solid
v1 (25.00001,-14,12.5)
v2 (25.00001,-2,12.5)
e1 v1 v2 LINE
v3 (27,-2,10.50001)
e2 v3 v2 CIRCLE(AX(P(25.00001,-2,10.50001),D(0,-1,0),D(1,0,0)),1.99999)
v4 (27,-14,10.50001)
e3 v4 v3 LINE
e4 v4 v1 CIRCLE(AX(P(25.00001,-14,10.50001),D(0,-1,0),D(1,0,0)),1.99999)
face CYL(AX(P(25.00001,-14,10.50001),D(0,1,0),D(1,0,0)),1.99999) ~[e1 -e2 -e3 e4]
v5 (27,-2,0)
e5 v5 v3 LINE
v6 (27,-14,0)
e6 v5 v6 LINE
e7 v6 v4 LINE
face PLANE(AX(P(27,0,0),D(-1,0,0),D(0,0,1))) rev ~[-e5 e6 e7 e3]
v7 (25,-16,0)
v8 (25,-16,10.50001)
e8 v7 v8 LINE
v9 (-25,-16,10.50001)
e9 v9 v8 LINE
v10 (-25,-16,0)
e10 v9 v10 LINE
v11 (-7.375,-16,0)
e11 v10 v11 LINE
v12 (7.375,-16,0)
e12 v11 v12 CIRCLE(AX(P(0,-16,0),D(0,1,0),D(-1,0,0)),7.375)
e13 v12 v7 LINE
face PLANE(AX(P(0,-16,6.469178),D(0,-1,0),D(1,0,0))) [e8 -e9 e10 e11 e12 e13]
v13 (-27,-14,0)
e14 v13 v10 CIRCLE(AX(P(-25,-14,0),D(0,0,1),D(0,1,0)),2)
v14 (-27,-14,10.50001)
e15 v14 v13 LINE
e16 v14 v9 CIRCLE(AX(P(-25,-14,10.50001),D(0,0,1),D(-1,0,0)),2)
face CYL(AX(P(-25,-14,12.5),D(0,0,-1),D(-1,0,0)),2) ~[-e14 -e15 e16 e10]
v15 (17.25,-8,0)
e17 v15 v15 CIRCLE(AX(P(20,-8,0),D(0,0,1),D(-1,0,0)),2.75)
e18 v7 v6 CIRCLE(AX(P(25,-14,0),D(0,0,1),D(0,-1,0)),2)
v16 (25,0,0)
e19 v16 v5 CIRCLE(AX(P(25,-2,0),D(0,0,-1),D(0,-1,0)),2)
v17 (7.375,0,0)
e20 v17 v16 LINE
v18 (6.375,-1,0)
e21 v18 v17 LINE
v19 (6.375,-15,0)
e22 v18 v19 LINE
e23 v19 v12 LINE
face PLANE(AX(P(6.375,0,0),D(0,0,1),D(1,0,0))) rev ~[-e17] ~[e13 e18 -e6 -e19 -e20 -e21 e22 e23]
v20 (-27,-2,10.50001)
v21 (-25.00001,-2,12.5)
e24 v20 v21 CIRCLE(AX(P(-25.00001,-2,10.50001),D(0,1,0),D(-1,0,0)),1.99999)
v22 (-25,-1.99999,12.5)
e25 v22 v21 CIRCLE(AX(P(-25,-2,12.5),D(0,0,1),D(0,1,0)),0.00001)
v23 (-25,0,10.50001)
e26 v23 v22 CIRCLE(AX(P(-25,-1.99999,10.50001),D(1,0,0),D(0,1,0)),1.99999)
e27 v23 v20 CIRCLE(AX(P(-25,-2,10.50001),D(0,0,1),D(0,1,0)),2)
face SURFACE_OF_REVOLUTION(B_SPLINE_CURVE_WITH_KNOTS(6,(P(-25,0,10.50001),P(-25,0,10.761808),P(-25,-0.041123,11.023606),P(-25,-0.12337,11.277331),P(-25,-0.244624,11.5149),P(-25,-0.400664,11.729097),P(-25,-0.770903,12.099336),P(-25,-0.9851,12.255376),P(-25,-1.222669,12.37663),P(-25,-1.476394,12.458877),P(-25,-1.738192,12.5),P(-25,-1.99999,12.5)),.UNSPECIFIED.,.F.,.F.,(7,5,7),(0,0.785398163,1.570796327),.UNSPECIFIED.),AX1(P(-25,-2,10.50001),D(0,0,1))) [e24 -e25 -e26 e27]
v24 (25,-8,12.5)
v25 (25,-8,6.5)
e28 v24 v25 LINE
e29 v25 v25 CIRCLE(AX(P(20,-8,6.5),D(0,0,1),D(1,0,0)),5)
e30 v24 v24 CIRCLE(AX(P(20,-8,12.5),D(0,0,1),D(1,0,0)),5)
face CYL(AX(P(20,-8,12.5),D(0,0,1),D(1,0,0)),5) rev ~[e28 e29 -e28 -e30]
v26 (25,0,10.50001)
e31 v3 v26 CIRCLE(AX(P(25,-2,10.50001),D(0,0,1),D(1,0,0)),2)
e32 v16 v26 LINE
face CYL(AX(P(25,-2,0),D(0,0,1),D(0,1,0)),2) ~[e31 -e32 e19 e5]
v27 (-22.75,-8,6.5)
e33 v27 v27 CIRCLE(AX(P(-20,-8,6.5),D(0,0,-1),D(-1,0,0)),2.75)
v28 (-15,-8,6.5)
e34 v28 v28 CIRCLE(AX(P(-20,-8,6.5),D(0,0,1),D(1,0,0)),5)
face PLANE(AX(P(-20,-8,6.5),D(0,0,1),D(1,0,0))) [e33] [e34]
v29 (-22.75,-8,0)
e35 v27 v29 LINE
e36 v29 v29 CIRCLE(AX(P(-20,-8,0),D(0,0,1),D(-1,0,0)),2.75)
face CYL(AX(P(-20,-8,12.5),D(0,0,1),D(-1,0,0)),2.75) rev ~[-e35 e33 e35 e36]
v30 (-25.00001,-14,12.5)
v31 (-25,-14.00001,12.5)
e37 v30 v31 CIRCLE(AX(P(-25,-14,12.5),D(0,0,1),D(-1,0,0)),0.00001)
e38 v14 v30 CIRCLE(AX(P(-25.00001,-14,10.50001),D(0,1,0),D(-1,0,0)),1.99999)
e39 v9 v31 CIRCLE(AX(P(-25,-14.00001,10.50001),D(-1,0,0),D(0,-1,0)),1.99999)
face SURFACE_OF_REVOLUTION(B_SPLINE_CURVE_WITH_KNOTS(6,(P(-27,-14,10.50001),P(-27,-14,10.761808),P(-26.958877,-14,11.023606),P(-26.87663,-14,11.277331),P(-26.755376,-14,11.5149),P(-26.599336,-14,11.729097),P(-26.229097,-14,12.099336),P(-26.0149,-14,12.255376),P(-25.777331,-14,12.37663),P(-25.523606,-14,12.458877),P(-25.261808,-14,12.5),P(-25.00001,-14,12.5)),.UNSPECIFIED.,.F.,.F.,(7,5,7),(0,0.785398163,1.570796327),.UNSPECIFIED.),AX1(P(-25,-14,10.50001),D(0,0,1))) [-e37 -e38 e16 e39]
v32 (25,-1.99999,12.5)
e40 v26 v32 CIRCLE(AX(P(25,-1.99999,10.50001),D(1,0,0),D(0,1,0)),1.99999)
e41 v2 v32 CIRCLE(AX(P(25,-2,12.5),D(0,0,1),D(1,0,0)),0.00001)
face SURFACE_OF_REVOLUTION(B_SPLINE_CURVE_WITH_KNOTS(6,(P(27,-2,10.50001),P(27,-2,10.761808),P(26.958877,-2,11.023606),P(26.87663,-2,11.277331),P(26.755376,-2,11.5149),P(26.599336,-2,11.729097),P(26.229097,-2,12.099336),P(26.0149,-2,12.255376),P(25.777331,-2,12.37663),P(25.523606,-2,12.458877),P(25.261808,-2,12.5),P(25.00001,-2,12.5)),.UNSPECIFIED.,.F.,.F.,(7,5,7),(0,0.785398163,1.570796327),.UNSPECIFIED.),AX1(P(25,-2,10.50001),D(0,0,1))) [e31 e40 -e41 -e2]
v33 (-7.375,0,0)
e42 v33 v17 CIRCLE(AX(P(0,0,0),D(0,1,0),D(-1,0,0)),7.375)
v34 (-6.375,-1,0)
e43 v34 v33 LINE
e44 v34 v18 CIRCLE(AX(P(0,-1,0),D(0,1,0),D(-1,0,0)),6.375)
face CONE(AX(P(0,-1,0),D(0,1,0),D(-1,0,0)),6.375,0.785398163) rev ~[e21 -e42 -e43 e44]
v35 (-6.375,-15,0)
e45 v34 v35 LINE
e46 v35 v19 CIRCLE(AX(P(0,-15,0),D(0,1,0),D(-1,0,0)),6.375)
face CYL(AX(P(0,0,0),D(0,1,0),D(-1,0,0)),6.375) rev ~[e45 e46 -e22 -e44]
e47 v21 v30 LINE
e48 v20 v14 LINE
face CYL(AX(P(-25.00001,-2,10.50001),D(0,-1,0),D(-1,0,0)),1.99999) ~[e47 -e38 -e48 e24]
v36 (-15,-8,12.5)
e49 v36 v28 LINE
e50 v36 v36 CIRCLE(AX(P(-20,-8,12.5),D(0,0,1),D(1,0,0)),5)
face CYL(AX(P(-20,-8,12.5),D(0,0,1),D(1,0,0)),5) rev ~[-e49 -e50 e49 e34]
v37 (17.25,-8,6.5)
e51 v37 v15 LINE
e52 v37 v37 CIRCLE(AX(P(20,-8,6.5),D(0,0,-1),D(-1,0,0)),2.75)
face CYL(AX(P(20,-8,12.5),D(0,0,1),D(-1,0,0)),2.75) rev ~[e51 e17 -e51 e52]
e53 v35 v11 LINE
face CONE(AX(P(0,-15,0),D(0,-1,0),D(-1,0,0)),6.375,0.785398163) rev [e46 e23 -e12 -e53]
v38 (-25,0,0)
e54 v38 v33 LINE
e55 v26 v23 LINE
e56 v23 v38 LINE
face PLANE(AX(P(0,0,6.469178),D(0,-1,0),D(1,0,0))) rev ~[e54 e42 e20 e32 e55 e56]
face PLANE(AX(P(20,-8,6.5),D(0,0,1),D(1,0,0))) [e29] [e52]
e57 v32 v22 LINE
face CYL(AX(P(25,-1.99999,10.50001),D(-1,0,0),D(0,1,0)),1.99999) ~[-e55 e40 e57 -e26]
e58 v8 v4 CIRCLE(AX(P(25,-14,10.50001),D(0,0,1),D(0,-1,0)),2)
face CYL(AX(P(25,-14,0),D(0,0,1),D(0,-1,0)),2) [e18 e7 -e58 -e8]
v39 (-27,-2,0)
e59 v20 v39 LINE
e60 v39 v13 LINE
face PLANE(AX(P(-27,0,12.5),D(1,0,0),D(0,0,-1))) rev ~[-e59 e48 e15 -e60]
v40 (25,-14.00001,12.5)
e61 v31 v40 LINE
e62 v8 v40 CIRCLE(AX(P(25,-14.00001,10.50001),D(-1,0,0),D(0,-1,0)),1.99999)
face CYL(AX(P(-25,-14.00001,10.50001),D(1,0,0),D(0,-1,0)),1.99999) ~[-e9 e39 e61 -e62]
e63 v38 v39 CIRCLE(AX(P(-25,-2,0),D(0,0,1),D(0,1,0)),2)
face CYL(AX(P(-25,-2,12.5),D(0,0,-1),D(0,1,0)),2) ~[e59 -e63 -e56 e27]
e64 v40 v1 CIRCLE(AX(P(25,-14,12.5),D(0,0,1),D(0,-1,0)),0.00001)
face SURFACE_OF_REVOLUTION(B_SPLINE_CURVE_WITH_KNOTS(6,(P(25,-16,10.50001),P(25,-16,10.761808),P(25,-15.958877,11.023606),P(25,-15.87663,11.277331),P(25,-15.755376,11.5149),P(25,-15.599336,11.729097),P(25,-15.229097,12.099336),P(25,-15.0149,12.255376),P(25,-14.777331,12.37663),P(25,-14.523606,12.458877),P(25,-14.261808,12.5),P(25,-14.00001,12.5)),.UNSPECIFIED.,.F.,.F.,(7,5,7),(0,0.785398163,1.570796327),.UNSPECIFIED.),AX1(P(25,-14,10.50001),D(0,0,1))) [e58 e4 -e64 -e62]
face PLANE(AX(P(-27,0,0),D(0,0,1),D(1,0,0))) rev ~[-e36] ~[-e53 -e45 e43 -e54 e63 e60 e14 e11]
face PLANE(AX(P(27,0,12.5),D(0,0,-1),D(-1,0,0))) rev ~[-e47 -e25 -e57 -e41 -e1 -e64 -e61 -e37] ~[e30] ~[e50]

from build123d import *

# Parameters (mm, degrees)
F1_DEPTH = 16
F3_DEPTH = 12.501
F4_R     = 5
F4_R_2   = 2.75
F5_DEPTH = 6
F6_SIZE  = 1
F7_R     = 2
F8_R     = 1.99999


# Not quite as in the source:
# - a fillet or chamfer is up to 0.001 mm smaller than in the source, because OpenCascade refuses the exact size


with BuildPart() as f1:
    # F0 (on Front) → F1 (new body)
    with BuildSketch(Plane.XZ):
        with BuildLine():
            Line((27, 12.5), (-27, 12.5))
            Line((-27, 12.5), (-27, 0))
            Line((-27, 0), (-6.375, 0))
            ThreePointArc((-6.375, 0), (0, 6.375), (6.375, 0))
            Line((6.375, 0), (27, 0))
            Line((27, 0), (27, 12.5))
        make_face()
    extrude(amount=F1_DEPTH)

    # F2 (on face) → F3 (cut, through all)
    with BuildSketch(Plane.XY.offset(12.5)):
        with BuildLine():
            Line((-22.75, -8), (-17.25, -8))
            ThreePointArc((-17.25, -8), (-20, -5.25), (-22.75, -8))
        make_face()
        with BuildLine():
            ThreePointArc((-22.75, -8), (-20, -10.75), (-17.25, -8))
            Line((-17.25, -8), (-22.75, -8))
        make_face()
        with BuildLine():
            Line((17.25, -8), (22.75, -8))
            ThreePointArc((22.75, -8), (20, -5.25), (17.25, -8))
        make_face()
        with BuildLine():
            ThreePointArc((17.25, -8), (20, -10.75), (22.75, -8))
            Line((22.75, -8), (17.25, -8))
        make_face()
    extrude(amount=-F3_DEPTH, mode=Mode.SUBTRACT)

    # F4 (on face) → F5 (cut)
    with BuildSketch(Plane.XY.offset(12.5)):
        with Locations((-20, -8)):
            Circle(F4_R)
        with Locations((-20, -8)):
            Circle(F4_R_2, mode=Mode.SUBTRACT)
        with Locations((20, -8)):
            Circle(F4_R)
        with Locations((20, -8)):
            Circle(F4_R_2, mode=Mode.SUBTRACT)
    extrude(amount=-F5_DEPTH, mode=Mode.SUBTRACT)

    # F6
    f6_edges = [f1.edges().sort_by_distance(p)[0] for p in [
        (0, -16, 6.375),
        (0, 0, 6.375),
    ]]
    chamfer(f6_edges, length=F6_SIZE)

    # F7
    f7_edges = [f1.edges().sort_by_distance(p)[0] for p in [
        (27, 0, 6.25),
        (27, -16, 6.25),
        (-27, 0, 6.25),
        (-27, -16, 6.25),
    ]]
    fillet(f7_edges, radius=F7_R)

    # F8 (radius 2 in the source; OpenCascade refuses exactly that, so slightly less here)
    f8_edges = [f1.edges().sort_by_distance(p)[0] for p in [
        (0, 0, 12.5),
    ]]
    fillet(f8_edges, radius=F8_R)


solid = f1.part
